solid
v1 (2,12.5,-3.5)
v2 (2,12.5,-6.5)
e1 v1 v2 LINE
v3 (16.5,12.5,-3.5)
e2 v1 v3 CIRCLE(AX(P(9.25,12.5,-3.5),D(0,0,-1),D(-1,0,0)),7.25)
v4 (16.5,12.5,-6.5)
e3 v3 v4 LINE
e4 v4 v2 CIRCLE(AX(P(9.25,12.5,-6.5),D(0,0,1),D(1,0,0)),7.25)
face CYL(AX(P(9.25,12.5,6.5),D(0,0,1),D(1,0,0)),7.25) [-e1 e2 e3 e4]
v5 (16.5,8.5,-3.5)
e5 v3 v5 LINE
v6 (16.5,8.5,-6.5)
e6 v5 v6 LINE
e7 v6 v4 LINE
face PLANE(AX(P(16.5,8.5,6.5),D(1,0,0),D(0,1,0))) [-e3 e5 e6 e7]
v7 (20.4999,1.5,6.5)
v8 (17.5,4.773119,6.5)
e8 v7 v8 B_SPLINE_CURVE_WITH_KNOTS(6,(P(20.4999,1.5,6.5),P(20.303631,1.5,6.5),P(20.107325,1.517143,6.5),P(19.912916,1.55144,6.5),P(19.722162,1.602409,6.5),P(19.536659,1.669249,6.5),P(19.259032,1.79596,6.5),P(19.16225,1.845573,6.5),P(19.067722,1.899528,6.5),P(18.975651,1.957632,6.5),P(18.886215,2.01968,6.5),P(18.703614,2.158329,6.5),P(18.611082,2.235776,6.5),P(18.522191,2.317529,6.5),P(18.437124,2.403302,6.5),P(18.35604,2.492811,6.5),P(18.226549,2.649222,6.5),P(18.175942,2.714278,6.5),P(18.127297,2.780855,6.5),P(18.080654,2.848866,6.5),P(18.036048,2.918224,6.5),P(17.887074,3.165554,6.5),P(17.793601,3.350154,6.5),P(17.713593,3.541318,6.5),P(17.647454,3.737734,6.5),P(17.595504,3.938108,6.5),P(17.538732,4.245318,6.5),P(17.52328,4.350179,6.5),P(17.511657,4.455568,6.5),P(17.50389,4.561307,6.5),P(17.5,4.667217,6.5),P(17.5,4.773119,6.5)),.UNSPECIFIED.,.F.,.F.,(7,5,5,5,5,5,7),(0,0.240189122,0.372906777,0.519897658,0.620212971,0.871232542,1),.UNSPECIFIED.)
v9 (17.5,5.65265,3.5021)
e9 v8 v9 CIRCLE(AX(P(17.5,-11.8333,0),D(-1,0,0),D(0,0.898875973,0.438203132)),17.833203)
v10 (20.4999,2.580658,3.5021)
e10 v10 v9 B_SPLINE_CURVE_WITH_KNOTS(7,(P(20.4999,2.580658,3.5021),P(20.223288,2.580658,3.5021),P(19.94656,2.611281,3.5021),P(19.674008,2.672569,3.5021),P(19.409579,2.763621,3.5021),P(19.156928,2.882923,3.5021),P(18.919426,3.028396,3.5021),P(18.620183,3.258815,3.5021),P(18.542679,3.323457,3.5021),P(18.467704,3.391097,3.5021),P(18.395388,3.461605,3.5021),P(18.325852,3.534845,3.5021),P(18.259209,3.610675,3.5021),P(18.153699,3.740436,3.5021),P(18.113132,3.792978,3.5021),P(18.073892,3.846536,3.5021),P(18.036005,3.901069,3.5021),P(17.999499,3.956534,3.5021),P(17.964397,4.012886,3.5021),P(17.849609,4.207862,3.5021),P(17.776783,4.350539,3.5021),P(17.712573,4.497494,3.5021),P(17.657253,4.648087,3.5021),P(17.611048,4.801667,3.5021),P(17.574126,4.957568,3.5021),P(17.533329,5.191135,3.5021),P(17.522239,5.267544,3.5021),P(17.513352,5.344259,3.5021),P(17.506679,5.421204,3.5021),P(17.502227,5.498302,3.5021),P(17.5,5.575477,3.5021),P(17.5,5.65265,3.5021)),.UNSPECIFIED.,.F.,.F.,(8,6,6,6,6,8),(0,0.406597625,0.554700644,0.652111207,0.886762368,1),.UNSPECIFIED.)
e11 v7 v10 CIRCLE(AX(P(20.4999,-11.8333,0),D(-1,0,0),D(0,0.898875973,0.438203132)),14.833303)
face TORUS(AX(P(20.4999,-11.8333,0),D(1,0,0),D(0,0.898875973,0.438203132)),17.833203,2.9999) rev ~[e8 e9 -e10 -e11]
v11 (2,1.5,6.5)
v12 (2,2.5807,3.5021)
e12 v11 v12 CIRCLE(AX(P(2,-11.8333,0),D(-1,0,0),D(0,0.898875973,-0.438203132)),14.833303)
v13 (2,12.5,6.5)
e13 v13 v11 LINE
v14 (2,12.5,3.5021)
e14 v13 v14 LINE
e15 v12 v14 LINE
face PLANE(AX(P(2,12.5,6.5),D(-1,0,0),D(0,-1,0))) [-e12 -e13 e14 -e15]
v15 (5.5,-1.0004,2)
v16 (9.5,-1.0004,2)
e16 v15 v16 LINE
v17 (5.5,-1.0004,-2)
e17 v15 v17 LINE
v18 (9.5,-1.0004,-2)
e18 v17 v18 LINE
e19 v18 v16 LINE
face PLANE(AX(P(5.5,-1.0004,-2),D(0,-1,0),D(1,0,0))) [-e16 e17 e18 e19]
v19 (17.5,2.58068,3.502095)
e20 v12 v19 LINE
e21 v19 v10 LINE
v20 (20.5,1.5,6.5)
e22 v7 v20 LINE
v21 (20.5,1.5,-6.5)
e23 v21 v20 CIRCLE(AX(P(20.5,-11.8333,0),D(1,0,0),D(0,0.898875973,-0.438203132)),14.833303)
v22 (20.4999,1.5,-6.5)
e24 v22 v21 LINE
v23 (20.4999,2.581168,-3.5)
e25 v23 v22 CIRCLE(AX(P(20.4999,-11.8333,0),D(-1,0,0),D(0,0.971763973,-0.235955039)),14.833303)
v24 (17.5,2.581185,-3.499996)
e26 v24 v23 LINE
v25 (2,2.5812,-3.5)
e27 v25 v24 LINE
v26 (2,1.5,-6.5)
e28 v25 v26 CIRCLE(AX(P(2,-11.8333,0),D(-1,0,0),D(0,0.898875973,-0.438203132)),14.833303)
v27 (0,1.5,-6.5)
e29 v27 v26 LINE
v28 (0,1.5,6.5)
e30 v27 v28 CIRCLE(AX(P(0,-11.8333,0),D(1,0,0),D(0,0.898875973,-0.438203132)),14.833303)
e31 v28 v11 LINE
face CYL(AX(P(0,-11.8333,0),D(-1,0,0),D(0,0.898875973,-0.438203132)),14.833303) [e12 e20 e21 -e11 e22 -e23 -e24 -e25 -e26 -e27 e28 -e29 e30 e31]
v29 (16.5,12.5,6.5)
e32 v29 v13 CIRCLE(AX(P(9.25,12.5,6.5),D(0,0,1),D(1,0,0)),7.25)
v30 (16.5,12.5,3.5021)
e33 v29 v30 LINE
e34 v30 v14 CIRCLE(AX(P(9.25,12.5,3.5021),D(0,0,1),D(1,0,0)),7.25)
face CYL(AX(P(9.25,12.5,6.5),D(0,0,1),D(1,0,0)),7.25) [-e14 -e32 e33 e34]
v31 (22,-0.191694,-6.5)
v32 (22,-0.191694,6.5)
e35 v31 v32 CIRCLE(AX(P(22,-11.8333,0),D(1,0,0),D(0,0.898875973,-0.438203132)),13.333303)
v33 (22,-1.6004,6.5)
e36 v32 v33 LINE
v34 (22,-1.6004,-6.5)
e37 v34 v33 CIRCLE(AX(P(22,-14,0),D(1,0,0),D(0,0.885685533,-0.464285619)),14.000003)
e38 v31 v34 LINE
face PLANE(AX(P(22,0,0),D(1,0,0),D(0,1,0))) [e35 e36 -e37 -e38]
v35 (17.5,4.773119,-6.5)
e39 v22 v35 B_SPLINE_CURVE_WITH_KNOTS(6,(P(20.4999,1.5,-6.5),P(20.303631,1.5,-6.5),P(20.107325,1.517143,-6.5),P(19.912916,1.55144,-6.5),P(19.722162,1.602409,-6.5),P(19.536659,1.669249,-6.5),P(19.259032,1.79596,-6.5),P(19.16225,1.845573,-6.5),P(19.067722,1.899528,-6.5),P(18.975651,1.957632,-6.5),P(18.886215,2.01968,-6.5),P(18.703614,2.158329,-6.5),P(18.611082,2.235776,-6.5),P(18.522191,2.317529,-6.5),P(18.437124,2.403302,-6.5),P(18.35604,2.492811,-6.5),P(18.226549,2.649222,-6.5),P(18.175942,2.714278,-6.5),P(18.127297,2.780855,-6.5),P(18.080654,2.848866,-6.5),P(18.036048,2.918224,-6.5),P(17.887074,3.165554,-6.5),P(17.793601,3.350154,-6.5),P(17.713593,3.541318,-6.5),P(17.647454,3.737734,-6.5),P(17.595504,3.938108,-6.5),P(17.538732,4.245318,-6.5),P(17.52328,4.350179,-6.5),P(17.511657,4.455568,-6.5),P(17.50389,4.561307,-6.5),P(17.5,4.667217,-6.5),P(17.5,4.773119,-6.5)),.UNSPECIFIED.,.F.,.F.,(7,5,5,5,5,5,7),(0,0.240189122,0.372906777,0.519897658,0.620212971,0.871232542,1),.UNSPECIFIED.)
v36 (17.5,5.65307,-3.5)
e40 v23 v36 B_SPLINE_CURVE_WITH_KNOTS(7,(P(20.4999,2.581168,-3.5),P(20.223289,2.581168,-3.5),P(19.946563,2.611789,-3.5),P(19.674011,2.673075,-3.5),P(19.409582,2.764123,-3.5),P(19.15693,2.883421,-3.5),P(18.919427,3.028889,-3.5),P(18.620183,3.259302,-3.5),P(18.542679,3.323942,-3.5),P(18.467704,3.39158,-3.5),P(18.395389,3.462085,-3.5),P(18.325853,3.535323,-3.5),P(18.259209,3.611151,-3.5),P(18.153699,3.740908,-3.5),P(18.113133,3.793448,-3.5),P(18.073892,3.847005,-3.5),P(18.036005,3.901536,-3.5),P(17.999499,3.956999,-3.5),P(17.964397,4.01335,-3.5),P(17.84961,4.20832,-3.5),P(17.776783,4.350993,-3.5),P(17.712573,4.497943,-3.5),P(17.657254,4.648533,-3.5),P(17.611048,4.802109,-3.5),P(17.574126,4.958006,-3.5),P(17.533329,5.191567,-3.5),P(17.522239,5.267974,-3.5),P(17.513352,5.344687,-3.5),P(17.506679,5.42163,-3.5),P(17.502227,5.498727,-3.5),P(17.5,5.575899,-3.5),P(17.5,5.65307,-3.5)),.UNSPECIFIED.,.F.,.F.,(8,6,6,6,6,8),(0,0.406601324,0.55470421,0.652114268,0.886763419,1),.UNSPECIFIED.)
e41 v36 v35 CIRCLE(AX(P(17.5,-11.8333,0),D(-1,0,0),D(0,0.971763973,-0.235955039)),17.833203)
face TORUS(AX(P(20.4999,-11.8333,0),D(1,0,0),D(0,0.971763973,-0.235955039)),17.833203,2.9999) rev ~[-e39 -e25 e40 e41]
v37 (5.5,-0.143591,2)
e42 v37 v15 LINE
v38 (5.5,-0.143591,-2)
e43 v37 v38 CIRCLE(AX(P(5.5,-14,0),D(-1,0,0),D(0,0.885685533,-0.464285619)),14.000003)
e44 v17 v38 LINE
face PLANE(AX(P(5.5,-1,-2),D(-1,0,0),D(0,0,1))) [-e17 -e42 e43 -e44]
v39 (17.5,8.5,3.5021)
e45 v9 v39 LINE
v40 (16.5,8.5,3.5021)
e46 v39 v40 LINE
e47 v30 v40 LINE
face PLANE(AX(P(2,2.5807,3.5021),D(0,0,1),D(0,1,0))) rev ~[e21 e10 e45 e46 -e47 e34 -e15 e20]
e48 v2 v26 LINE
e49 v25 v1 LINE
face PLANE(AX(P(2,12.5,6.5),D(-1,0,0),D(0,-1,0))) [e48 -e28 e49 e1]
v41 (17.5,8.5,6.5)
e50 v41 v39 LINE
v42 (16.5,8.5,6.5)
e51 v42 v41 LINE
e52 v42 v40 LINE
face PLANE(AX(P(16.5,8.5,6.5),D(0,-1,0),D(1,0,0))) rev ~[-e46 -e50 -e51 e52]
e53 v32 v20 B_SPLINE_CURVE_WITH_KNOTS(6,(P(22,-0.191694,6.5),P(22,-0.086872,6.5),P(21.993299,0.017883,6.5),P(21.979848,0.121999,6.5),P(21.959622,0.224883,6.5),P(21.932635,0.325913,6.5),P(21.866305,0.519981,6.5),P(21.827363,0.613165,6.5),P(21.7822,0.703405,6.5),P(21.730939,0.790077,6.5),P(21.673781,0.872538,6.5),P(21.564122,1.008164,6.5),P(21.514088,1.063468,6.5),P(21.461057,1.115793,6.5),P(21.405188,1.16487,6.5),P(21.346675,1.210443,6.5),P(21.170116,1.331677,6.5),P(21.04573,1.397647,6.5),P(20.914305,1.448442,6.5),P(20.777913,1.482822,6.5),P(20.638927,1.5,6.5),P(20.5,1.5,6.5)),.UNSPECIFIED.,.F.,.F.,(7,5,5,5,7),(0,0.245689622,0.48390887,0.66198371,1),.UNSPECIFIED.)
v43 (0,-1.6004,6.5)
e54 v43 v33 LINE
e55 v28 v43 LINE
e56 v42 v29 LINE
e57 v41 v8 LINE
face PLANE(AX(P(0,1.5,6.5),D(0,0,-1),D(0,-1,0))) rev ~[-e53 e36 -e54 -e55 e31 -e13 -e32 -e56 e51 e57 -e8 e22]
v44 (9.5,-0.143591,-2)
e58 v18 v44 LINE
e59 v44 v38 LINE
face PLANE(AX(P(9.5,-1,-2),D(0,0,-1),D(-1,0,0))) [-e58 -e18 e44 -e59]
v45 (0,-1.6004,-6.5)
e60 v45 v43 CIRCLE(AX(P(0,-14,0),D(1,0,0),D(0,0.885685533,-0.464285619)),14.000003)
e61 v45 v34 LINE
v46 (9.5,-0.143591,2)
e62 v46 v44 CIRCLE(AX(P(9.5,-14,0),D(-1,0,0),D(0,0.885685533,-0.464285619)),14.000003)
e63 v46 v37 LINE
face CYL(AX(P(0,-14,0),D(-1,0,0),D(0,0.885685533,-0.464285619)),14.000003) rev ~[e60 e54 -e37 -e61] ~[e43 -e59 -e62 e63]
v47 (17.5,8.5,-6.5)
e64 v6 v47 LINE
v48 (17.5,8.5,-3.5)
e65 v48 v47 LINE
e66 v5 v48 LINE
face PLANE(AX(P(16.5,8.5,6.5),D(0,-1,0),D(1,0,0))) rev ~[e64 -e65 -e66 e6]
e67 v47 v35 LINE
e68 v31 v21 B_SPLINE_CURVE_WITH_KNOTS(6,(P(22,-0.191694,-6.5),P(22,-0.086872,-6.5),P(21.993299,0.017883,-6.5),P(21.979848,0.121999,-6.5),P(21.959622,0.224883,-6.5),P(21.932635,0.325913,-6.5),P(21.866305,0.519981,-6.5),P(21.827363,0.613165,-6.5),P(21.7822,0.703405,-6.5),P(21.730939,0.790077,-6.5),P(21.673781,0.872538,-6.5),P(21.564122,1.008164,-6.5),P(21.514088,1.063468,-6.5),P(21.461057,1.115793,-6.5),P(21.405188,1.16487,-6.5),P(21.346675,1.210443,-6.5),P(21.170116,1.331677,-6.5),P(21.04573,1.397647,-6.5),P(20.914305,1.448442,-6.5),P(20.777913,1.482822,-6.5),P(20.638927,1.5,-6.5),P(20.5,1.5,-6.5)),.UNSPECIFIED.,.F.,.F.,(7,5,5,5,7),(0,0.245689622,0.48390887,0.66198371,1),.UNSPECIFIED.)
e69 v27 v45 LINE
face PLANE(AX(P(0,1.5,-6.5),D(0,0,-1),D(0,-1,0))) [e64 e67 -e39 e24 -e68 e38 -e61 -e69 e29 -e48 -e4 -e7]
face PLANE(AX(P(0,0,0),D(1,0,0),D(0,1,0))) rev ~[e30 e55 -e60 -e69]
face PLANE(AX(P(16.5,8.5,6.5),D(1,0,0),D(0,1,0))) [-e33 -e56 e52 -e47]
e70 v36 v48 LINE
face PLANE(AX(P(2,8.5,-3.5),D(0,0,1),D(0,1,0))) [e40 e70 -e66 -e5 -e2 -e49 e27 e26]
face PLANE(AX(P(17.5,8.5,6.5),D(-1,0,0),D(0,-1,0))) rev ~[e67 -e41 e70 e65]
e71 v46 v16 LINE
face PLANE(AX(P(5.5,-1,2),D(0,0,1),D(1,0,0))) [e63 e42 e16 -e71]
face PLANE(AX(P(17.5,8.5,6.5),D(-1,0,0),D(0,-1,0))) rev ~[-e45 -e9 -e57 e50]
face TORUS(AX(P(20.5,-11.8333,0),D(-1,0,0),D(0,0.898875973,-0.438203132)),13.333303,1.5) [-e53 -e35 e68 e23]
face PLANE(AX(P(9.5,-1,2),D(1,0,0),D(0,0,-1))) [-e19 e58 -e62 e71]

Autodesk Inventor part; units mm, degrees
ref_plane "YZ Plane" through (0, 0, 0) normal (1, 0, 0) x (0, 1, 0)
ref_plane "XZ Plane" through (0, 0, 0) normal (0, 1, 0) x (-1, 0, 0)
ref_plane "XY Plane" through (0, 0, 0) normal (0, 0, 1) x (1, 0, 0)
sketch "Sketch1" plane through (0, 0, 0) normal (1, 0, 0) x (0, 1, 0)
  line L0 (1.5, 6.5) -> (-1.5, 6.5) construction
  line L1 (-1.5, 6.5) -> (-1.6004, 6.5) construction
  line L2 (1.5, -6.5) -> (-1.5, -6.5) construction
  line L3 (-1.5, -6.5) -> (-1.6004, -6.5) construction
  arc A0 (-1.6004, -6.5) -> (-1.6004, 6.5) centre (-14, 0) ccw
  arc A1 (1.5, -6.5) -> (1.5, 6.5) centre (-11.8333, 0) ccw
  arc A2 (1.5, -6.5) -> (1.5, 6.5) centre (-11.8333, 0) ccw
  line L4 (1.5, -6.5) -> (-1.6004, -6.5)
  line L5 (1.5, 6.5) -> (-1.6004, 6.5)
  point P0 (0, 0)
  point P1 (0, 0)
extrude "Extrusion1" add sketch "Sketch1" along normal blind 22
sketch "Sketch2" plane through (0, -1.6004, 6.5) normal (0, 0, 1) x (1, 0, 0)
  line L0 (2, 3.1004) -> (0, 3.1004)
  line L1 (2, 14.1004) -> (2, 3.1004)
  line L2 (2, 3.1004) -> (2, 14.1004)
  line L3 (16.5, 10.1004) -> (16.5, 14.1004)
  line L4 (16.5, 14.1004) -> (16.5, 10.1004)
  line L5 (16.5, 10.1004) -> (17.5, 10.1004)
  line L6 (16.5, 10.1004) -> (17.5, 10.1004)
  line L7 (17.5, 3.1004) -> (22, 3.1004)
  line L8 (17.5, 10.1004) -> (17.5, 3.1004)
  arc A0 (16.5, 14.1004) -> (2, 14.1004) centre (9.25, 14.1004) ccw
  line L9 (0, 1.6004) -> (0, 0) projected
  line L10 (0, 0) -> (0, 14.7425)
  line L11 (0, 3.1004) -> (0, 4.6004) construction
  line L12 (0, 3.1004) -> (-6.4438, 3.1004) construction
  line L13 (0, 3.1004) -> (6.4438, 3.1004) construction
  line L14 (2, 3.1004) -> (17.5, 3.1004)
  dimension "d2" = 180
extrude "Extrusion2" add sketch "Sketch2" against normal up to surface (13 mm away)
sketch "Sketch3" plane through (2, 1.5, 6.5) normal (-1, 0, 0) x (0, 0, 1)
  line L0 (0, 0) -> (0, -3)
  line L1 (-13, 11) -> (-13, 18.25)
  line L2 (0, 0) -> (-13, 0)
  line L3 (-13, 0) -> (-13, 18.25)
  line L4 (-13, 18.25) -> (0, 18.25)
  line L5 (0, 18.25) -> (0, 0)
  arc A0 (0, 0) -> (-13, 0) centre (-6.5, -13.3333) ccw
  arc A1 (0, 0) -> (-13, 0) centre (-6.5, -13.3333) ccw
  line L6 (-10, 1.0812) -> (-10, 7)
  line L7 (-10, 1.0812) -> (-10, 18.25)
  line L8 (-2.9979, 11) -> (-2.9979, 18.25)
  line L9 (-2.9979, 1.0807) -> (-2.9979, 18.25)
  point P0 (-6.5, -1.5)
  point P1 (-2.9979, 1.0807)
extrude "Extrusion3" cut sketch "Sketch3" against normal blind 22 contours L4 L8 L9 A0 L6 L7
fillet "Fillet1" radius 1.5 1 edges at (22, 3, 0)
fillet "Fillet2" radius 3 2 edges at (17.5, 2.1211, 5.0302) (17.5, 2.1214, -5.0291)
sketch "Sketch4" plane through (0, 0, 0) normal (0, 1, 0) x (-1, 0, 0)
  line L0 (0, 0) -> (-7.5, 0)
  line L1 (-5.5, -2) -> (-9.5, -2)
  line L2 (-9.5, -2) -> (-9.5, 2)
  line L3 (-9.5, 2) -> (-5.5, 2)
  line L4 (-5.5, 2) -> (-5.5, -2)
  dimension "d9" = 7.5
  dimension "d10" = 4
  dimension "d11" = 4
extrude "Extrusion4" add sketch "Sketch4" along normal blind 0.5 and the other way blind 1
sketch "Sketch5" plane through (0, -1, 0) normal (0, -1, 0) x (1, 0, 0)
  line L0 (9.5, 2) -> (9.5, -2) projected
  line L1 (5.5, -2) -> (5.5, 2) projected
  line L2 (9.5, -2) -> (5.5, -2)
  line L3 (5.5, -2) -> (5.5, 2)
  line L4 (5.5, 2) -> (9.5, 2)
  line L5 (9.5, 2) -> (9.5, -2)
  point P0 (0, 0)
extrude "Extrusion5" add sketch "Sketch5" along normal up to surface (0.6004 mm away)
sketch "Sketch6" plane through (5.5, -1.6004, -2) normal (0, -1, 0) x (1, 0, 0)
  line L0 (0, 4) -> (4, 4) projected
  line L1 (0, 0) -> (4, 0)
  line L2 (4, 0) -> (4, 4)
  line L3 (4, 4) -> (0, 4)
  line L4 (0, 4) -> (0, 0)
  point P0 (-5.5, 2)
extrude "Extrusion6" cut sketch "Sketch6" against normal blind 0.6
properties part number "Clip"
